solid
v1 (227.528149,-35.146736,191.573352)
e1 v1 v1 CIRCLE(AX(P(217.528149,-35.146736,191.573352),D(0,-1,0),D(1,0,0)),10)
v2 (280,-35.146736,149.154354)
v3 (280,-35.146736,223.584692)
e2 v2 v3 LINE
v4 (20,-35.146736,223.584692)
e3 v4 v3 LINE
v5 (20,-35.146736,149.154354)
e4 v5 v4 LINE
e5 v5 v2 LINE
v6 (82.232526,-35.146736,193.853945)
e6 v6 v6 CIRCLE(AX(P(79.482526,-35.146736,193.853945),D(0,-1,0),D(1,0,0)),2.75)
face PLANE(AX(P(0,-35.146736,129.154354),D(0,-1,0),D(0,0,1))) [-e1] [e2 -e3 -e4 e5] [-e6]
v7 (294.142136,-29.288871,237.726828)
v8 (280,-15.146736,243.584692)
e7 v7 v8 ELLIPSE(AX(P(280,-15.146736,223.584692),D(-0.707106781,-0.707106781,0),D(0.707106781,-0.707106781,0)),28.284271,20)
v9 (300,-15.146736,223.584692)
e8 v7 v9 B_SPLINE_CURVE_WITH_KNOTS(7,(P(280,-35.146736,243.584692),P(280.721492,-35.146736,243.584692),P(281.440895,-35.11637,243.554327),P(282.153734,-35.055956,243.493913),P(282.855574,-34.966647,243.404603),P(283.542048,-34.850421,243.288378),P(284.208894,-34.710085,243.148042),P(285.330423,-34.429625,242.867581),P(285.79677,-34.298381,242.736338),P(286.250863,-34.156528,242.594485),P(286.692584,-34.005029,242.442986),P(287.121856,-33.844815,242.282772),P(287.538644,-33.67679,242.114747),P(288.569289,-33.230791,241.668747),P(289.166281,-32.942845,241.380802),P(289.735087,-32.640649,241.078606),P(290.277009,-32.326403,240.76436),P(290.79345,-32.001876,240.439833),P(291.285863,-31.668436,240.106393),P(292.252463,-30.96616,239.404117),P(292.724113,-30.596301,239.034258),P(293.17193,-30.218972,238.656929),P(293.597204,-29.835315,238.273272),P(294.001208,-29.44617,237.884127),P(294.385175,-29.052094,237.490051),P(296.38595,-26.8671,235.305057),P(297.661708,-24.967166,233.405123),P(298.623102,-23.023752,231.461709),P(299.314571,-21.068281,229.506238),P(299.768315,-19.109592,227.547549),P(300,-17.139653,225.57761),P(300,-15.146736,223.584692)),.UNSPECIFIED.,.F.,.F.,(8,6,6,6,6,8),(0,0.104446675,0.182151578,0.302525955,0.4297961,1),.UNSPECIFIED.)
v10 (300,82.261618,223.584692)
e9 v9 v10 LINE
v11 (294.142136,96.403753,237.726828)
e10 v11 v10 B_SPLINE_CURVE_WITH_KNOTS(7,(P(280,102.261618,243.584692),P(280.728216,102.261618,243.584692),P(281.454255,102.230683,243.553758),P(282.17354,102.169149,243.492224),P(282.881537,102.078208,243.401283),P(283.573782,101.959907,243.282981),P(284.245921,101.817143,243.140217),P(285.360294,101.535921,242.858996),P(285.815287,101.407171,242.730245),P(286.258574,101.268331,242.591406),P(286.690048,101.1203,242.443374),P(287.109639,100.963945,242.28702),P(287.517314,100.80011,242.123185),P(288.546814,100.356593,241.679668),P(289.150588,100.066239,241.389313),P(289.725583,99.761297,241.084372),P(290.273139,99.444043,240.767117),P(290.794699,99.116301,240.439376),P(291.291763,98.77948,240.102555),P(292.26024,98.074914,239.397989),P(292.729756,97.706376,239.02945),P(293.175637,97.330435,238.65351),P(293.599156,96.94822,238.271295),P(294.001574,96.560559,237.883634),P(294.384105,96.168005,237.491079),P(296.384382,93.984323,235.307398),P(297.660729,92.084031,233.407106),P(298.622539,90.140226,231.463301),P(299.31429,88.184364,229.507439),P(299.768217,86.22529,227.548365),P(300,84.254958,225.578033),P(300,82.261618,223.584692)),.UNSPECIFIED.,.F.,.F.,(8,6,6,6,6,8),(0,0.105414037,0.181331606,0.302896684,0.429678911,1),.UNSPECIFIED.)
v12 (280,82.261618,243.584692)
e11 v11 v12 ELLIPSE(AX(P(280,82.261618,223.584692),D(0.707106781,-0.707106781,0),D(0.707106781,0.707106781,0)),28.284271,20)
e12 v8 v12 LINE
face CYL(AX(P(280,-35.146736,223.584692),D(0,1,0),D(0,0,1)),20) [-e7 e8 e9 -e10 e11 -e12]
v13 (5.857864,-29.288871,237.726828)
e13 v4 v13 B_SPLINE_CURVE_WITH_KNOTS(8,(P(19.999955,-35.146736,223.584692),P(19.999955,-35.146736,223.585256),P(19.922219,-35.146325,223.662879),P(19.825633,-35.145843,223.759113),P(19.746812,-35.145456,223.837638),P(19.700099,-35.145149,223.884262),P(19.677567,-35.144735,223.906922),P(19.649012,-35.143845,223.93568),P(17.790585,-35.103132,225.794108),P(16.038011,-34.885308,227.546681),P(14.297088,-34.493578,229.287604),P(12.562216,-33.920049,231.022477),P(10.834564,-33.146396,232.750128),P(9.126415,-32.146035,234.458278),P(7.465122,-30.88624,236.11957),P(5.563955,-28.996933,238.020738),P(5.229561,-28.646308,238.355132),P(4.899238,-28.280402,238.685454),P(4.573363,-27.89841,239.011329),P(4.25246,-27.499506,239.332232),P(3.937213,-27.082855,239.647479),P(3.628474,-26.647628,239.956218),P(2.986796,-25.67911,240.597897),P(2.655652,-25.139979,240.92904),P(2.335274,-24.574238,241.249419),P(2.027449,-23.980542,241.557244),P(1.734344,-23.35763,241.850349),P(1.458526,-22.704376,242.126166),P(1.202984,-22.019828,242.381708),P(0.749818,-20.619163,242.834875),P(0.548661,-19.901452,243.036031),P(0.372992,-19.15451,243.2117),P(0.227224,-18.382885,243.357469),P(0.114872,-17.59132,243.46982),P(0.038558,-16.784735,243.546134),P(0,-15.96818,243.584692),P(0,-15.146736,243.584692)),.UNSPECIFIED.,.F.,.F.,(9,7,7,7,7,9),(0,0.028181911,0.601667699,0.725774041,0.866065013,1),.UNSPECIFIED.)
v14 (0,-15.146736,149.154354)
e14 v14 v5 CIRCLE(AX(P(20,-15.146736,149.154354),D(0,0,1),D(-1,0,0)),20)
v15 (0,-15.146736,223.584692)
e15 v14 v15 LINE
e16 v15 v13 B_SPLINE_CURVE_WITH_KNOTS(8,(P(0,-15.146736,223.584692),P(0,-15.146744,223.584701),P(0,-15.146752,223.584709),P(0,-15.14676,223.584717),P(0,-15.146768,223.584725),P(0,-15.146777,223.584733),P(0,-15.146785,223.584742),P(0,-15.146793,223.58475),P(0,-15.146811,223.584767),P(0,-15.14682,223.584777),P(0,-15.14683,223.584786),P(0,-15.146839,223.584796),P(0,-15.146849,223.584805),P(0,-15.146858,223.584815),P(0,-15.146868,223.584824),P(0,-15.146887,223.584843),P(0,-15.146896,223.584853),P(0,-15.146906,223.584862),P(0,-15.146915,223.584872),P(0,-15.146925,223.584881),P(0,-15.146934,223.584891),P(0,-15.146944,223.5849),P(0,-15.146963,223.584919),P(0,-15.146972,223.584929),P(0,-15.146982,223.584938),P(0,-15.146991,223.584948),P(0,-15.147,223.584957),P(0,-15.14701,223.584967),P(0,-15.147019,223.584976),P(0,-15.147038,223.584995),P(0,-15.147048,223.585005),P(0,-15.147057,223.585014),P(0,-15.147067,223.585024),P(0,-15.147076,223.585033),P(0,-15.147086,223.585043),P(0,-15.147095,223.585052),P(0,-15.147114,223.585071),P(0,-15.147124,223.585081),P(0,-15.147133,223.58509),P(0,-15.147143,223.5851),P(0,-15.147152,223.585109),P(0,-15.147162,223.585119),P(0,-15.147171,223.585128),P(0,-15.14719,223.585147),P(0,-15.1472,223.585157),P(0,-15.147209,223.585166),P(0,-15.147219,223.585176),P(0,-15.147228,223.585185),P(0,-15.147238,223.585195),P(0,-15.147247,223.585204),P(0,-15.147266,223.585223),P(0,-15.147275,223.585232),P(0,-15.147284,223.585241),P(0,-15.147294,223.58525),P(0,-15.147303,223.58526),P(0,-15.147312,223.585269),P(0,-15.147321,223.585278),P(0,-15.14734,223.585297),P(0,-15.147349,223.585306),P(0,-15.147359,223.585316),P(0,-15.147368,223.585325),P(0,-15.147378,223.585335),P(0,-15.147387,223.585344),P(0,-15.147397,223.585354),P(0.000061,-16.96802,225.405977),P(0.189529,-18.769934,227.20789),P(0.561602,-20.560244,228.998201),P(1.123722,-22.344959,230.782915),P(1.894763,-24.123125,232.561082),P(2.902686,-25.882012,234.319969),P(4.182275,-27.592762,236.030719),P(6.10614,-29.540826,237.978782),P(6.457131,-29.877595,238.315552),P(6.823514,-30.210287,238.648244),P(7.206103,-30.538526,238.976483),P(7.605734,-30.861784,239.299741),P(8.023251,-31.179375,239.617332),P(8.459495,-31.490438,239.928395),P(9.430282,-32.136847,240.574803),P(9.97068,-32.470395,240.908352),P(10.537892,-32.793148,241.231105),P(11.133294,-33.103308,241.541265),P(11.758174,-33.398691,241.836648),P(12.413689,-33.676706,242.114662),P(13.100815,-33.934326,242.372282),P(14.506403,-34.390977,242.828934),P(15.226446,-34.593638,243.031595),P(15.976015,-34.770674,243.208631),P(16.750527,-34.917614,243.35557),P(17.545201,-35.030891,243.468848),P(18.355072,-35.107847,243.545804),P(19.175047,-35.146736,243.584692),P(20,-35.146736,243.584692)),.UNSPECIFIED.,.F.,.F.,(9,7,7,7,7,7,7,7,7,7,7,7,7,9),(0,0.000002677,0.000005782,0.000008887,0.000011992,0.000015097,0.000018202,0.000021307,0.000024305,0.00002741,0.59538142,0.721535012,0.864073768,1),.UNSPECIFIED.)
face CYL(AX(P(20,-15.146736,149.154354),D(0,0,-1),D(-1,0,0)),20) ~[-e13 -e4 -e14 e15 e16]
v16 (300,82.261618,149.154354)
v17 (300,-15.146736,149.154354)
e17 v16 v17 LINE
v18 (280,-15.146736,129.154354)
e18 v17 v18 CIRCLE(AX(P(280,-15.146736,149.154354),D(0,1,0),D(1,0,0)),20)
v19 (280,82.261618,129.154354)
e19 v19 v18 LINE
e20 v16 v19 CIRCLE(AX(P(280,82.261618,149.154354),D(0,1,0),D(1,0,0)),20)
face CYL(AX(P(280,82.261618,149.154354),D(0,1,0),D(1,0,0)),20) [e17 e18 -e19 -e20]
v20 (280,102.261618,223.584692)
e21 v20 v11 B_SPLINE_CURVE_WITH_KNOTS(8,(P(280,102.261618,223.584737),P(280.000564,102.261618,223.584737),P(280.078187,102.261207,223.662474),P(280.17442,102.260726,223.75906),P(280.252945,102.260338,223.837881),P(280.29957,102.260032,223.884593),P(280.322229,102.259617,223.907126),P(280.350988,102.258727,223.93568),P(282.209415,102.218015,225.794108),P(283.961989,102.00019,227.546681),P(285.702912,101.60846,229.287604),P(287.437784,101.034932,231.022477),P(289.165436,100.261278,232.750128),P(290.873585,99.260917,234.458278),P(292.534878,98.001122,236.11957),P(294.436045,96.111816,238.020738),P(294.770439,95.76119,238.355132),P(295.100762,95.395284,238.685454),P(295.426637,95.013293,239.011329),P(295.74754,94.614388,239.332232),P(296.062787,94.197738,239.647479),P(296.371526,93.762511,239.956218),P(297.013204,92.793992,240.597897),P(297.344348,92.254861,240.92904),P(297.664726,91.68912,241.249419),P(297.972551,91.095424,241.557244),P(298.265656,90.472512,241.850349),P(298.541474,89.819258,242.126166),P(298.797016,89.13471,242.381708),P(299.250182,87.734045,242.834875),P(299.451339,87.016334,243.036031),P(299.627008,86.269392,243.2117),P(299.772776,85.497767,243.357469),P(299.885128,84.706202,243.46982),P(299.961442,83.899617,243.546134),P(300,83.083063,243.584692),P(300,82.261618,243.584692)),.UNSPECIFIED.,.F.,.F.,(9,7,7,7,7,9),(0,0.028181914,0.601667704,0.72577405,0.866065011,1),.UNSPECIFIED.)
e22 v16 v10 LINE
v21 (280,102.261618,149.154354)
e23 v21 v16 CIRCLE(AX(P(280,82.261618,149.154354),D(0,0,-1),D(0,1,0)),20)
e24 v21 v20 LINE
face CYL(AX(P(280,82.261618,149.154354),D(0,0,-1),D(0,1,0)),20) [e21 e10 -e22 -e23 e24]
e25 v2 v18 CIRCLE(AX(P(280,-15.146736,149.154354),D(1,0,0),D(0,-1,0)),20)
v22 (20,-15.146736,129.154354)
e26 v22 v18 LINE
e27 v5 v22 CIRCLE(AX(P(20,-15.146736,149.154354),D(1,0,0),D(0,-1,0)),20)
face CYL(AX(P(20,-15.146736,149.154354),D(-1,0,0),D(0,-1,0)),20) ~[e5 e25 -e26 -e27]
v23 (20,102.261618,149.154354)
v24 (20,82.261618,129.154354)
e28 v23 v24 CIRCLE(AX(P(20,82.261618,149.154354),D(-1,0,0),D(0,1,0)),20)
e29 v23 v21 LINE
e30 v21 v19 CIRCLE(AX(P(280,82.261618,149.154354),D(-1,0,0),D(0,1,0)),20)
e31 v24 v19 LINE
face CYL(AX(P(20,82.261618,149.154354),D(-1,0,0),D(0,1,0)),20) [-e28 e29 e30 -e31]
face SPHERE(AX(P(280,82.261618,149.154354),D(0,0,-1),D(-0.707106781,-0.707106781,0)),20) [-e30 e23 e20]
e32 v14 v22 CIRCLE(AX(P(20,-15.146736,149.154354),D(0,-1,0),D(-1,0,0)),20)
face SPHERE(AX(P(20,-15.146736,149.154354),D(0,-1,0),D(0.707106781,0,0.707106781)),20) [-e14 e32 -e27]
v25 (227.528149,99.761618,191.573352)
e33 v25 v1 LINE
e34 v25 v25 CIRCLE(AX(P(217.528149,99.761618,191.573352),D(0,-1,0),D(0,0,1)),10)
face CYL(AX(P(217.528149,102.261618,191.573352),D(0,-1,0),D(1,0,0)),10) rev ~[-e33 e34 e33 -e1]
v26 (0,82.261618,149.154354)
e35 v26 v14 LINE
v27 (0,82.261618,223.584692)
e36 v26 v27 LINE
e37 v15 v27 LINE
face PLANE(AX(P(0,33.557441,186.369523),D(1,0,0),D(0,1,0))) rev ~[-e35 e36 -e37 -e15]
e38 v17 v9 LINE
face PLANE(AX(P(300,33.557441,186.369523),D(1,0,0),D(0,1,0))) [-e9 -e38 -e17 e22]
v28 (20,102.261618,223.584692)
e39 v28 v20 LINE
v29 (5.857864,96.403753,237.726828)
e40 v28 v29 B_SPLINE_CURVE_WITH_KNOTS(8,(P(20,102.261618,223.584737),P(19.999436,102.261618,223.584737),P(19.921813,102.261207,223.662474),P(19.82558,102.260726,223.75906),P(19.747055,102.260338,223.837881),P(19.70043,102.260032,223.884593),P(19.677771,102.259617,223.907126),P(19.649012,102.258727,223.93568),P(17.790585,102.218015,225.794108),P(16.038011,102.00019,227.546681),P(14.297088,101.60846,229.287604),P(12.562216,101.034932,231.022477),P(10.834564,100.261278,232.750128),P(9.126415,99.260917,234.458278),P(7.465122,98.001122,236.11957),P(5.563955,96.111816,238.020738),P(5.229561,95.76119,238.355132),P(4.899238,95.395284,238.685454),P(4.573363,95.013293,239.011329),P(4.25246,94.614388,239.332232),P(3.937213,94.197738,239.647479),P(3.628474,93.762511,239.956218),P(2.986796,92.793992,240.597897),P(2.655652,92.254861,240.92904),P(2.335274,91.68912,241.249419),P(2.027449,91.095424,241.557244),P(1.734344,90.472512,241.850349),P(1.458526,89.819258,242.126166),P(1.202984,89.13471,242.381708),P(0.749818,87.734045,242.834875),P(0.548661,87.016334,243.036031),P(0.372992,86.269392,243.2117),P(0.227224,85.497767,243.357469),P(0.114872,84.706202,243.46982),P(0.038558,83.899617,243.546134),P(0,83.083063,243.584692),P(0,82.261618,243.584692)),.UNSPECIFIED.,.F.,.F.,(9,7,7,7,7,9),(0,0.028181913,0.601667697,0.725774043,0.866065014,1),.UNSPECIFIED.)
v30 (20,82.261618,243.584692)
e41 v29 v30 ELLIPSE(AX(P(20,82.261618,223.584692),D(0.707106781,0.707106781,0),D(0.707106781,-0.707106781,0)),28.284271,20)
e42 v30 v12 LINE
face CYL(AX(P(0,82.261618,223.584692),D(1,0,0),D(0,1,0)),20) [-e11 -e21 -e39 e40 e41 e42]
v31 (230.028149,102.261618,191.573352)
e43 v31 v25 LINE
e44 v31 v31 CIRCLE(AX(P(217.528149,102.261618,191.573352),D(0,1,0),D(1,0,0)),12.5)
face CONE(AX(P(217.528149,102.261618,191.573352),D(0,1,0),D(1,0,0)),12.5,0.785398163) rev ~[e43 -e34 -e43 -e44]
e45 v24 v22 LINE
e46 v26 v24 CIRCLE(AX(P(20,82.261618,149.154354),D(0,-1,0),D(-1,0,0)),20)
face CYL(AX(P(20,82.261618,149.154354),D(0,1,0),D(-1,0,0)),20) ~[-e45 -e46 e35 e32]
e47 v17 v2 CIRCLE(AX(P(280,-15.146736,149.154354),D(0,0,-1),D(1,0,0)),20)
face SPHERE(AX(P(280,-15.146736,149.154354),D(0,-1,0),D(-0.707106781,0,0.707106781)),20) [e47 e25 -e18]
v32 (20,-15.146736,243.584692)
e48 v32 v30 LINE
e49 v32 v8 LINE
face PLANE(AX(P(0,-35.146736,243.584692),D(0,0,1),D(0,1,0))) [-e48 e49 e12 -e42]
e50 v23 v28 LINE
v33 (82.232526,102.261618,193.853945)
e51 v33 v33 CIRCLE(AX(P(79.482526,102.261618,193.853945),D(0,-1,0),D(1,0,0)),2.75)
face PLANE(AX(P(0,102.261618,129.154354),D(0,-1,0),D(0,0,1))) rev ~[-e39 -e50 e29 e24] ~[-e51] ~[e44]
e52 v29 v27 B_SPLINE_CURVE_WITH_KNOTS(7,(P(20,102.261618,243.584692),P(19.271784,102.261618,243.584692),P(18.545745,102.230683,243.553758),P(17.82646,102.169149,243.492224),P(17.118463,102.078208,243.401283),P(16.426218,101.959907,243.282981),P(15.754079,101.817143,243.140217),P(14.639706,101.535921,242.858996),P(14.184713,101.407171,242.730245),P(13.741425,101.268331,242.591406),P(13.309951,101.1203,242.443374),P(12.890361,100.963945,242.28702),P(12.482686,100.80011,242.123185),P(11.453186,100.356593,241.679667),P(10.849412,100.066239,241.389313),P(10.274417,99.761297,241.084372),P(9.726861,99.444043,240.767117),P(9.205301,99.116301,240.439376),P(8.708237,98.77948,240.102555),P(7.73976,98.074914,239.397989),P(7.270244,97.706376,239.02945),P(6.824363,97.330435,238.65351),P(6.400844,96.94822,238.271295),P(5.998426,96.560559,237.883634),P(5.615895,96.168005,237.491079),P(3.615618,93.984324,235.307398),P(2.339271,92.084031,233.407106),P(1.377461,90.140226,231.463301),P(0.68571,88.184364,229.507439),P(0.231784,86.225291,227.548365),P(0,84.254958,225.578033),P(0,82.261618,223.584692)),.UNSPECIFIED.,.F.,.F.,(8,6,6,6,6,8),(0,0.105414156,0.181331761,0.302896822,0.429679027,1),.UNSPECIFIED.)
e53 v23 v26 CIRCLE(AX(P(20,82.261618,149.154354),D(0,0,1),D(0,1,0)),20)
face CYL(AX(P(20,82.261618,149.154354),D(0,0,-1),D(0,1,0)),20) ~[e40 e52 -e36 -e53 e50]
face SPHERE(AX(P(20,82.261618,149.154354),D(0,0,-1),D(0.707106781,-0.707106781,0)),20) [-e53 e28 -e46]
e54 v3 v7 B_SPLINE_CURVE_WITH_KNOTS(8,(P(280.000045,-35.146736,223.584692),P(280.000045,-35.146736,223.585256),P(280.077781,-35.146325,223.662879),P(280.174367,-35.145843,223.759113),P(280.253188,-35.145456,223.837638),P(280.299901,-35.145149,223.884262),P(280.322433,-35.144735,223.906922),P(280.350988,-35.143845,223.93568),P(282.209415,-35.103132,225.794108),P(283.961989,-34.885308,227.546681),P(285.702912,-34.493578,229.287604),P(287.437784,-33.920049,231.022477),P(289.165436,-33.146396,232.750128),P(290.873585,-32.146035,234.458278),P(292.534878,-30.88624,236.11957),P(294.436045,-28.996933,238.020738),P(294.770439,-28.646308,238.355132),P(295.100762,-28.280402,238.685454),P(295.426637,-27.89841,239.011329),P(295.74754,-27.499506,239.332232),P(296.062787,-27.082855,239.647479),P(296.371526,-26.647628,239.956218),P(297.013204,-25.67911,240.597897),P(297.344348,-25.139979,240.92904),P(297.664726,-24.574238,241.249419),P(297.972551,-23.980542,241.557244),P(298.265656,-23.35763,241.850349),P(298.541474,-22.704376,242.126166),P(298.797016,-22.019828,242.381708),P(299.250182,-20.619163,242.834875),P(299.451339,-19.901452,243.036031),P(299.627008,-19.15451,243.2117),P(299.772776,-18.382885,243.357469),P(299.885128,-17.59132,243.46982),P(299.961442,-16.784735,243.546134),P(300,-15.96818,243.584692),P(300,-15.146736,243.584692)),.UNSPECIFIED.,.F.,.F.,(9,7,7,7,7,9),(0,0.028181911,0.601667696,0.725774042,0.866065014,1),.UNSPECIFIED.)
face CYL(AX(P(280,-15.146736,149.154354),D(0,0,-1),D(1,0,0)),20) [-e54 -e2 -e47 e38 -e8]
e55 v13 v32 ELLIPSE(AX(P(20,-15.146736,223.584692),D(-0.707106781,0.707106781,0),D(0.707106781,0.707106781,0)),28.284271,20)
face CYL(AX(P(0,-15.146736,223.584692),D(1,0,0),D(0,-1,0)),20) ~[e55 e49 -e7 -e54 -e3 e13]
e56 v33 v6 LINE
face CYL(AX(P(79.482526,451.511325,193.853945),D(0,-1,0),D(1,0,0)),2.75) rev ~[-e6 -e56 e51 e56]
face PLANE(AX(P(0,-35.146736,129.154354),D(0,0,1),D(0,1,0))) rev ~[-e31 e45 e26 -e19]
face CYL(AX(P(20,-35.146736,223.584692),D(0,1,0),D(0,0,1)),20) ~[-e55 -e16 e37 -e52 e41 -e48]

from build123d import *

# Parameters (mm, degrees)
F0_W           = 137.4083533883
F0_H           = 114.4303381443
F1_DEPTH       = 300
F2_R           = 20
F3_T1_DEPTH    = 124.4303381443
F3_T3_DEPTH    = 97.4083533883
F3_T5_DEPTH    = 260
F3_S9_W        = 20.4
F3_S9_H        = 20.4
F3_T10_DEPTH   = 20.4
F3_S15_W       = 20.4
F3_S15_H       = 20.4
F3_T16_DEPTH   = 20.4
F3_S21_W       = 20.4
F3_S21_H       = 20.4
F3_T22_DEPTH   = 20.4
F3_S27_W       = 20.4
F3_S27_H       = 20.4
F3_T28_DEPTH   = 20.4
F5_D           = 5.5
F7_D           = 20
F7_CSINK_D     = 25
F7_CSINK_ANGLE = 90


# Not quite as in the source:
# - a fillet or chamfer that OpenCascade refuses, or shapes differently, is made with other operations: its cross-section is extruded or revolved along the edge and cut away or added


with BuildPart() as f1:
    # F0 (on Right) → F1 (new body)
    with BuildSketch(Plane.YZ):
        with Locations((33.5574410856, 186.369523406)):
            Rectangle(F0_W, F0_H)
    extrude(amount=F1_DEPTH)

    # F2
    f2_edges = [f1.edges().sort_by_distance(p)[0] for p in [
        (150, 102.261618, 243.584692),
        (150, -35.146736, 243.584692),
        (0, 33.557441, 243.584692),
        (300, 33.557441, 243.584692),
    ]]
    fillet(f2_edges, radius=F2_R)

    # F3: fillet of radius 20 on 9 edges, made by hand

    # F3_s2 → F3_t1 (cut)
    with BuildSketch(Plane.XY.offset(149.1543543339)):
        with BuildLine():
            ThreePointArc((0, -15.1467356086), (5.8578643763, -29.2888712323), (20, -35.1467356086))
            Line((20, -35.1467356086), (0, -35.1467356086))
            Line((0, -35.1467356086), (0, -15.1467356086))
        make_face()
        with BuildLine():
            ThreePointArc((20, 102.2616177797), (5.8578643763, 96.4037534035), (0, 82.2616177797))
            Line((0, 82.2616177797), (0, 102.2616177797))
            Line((0, 102.2616177797), (20, 102.2616177797))
        make_face()
        with BuildLine():
            ThreePointArc((280, 102.2616177797), (294.1421356237, 96.4037534035), (300, 82.2616177797))
            Line((300, 82.2616177797), (300, 102.2616177797))
            Line((300, 102.2616177797), (280, 102.2616177797))
        make_face()
        with BuildLine():
            ThreePointArc((300, -15.1467356086), (294.1421356237, -29.2888712323), (280, -35.1467356086))
            Line((280, -35.1467356086), (300, -35.1467356086))
            Line((300, -35.1467356086), (300, -15.1467356086))
        make_face()
    extrude(amount=F3_T1_DEPTH, mode=Mode.SUBTRACT)

    # F3_s4 → F3_t3 (cut)
    with BuildSketch(Plane.XZ.offset(-82.2616177797)):
        with BuildLine():
            ThreePointArc((0, 149.1543543339), (5.8578643763, 135.0122187101), (20, 129.1543543339))
            Line((20, 129.1543543339), (0, 129.1543543339))
            Line((0, 129.1543543339), (0, 149.1543543339))
        make_face()
        with BuildLine():
            ThreePointArc((300, 149.1543543339), (294.1421356237, 135.0122187101), (280, 129.1543543339))
            Line((280, 129.1543543339), (300, 129.1543543339))
            Line((300, 129.1543543339), (300, 149.1543543339))
        make_face()
    extrude(amount=F3_T3_DEPTH, mode=Mode.SUBTRACT)

    # F3_s6 → F3_t5 (cut)
    with BuildSketch(Plane.YZ.offset(20)):
        with BuildLine():
            ThreePointArc((-35.1467356086, 149.1543543339), (-29.2888712323, 135.0122187101), (-15.1467356086, 129.1543543339))
            Line((-15.1467356086, 129.1543543339), (-35.1467356086, 129.1543543339))
            Line((-35.1467356086, 129.1543543339), (-35.1467356086, 149.1543543339))
        make_face()
        with BuildLine():
            ThreePointArc((102.2616177797, 149.1543543339), (96.4037534035, 135.0122187101), (82.2616177797, 129.1543543339))
            Line((82.2616177797, 129.1543543339), (102.2616177797, 129.1543543339))
            Line((102.2616177797, 129.1543543339), (102.2616177797, 149.1543543339))
        make_face()
    extrude(amount=F3_T5_DEPTH, mode=Mode.SUBTRACT)


with BuildPart() as f3_tool8:
    # F3_s9 → F3_t10 (new body)
    with BuildSketch(Plane.XZ.offset(15.1467356086)):
        with Locations((9.8, 138.9543543339)):
            Rectangle(F3_S9_W, F3_S9_H)
    extrude(amount=F3_T10_DEPTH)

    # F3_s11 → F3_t12 (revolve, cut)
    with BuildSketch(Plane(origin=(20, -15.1467356086, 149.1543543339), x_dir=(0.7071067812, 0, 0.7071067812), z_dir=(0.7071067812, 0, -0.7071067812))):
        with BuildLine():
            ThreePointArc((0, -20), (20, 0), (0, 20))
            Line((0, 20), (0, -20))
        make_face()
    revolve(axis=Axis((20, -15.1467356086, 149.1543543339), (0, -1, 0)), mode=Mode.SUBTRACT)


with BuildPart() as f1_1:
    add(f1.part)

    # F3_t7: cut F3_tool8
    add(f3_tool8.part, mode=Mode.SUBTRACT)


with BuildPart() as f3_tool14:
    # F3_s15 → F3_t16 (new body)
    with BuildSketch(Plane.XY.offset(149.1543543339)):
        with Locations((9.8, 92.4616177797)):
            Rectangle(F3_S15_W, F3_S15_H)
    extrude(amount=-F3_T16_DEPTH)

    # F3_s17 → F3_t18 (revolve, cut)
    with BuildSketch(Plane(origin=(20, 82.2616177797, 149.1543543339), x_dir=(0.7071067812, -0.7071067812, 0), z_dir=(0.7071067812, 0.7071067812, 0))):
        with BuildLine():
            ThreePointArc((0, -20), (20, 0), (0, 20))
            Line((0, 20), (0, -20))
        make_face()
    revolve(axis=Axis((20, 82.2616177797, 149.1543543339), (0, 0, -1)), mode=Mode.SUBTRACT)


with BuildPart() as f1_2:
    add(f1_1.part)

    # F3_t13: cut F3_tool14
    add(f3_tool14.part, mode=Mode.SUBTRACT)


with BuildPart() as f3_tool20:
    # F3_s21 → F3_t22 (new body)
    with BuildSketch(Plane.XZ.offset(15.1467356086)):
        with Locations((290.2, 138.9543543339)):
            Rectangle(F3_S21_W, F3_S21_H)
    extrude(amount=F3_T22_DEPTH)

    # F3_s23 → F3_t24 (revolve, cut)
    with BuildSketch(Plane(origin=(280, -15.1467356086, 149.1543543339), x_dir=(-0.7071067812, 0, 0.7071067812), z_dir=(0.7071067812, 0, 0.7071067812))):
        with BuildLine():
            ThreePointArc((0, -20), (20, 0), (0, 20))
            Line((0, 20), (0, -20))
        make_face()
    revolve(axis=Axis((280, -15.1467356086, 149.1543543339), (0, -1, 0)), mode=Mode.SUBTRACT)


with BuildPart() as f1_3:
    add(f1_2.part)

    # F3_t19: cut F3_tool20
    add(f3_tool20.part, mode=Mode.SUBTRACT)


with BuildPart() as f3_tool26:
    # F3_s27 → F3_t28 (new body)
    with BuildSketch(Plane.XY.offset(149.1543543339)):
        with Locations((290.2, 92.4616177797)):
            Rectangle(F3_S27_W, F3_S27_H)
    extrude(amount=-F3_T28_DEPTH)

    # F3_s29 → F3_t30 (revolve, cut)
    with BuildSketch(Plane(origin=(280, 82.2616177797, 149.1543543339), x_dir=(-0.7071067812, -0.7071067812, 0), z_dir=(0.7071067812, -0.7071067812, 0))):
        with BuildLine():
            ThreePointArc((0, -20), (20, 0), (0, 20))
            Line((0, 20), (0, -20))
        make_face()
    revolve(axis=Axis((280, 82.2616177797, 149.1543543339), (0, 0, -1)), mode=Mode.SUBTRACT)


with BuildPart() as f1_4:
    add(f1_3.part)

    # F3_t25: cut F3_tool26
    add(f3_tool26.part, mode=Mode.SUBTRACT)

    # F5 (through all)
    with Locations(Plane(origin=(0, 102.2616177797, 0), x_dir=(-1, 0, 0), z_dir=(0, 1, 0))):
        with Locations((-79.4825255871, 193.85394454)):
            Hole(F5_D / 2)

    # F7 (through all)
    with Locations(Plane(origin=(0, 102.2616177797, 0), x_dir=(-1, 0, 0), z_dir=(0, 1, 0))):
        with Locations((-217.5281494856, 191.5733516216)):
            CounterSinkHole(F7_D / 2, F7_CSINK_D / 2, counter_sink_angle=F7_CSINK_ANGLE)


solid = f1_4.part
